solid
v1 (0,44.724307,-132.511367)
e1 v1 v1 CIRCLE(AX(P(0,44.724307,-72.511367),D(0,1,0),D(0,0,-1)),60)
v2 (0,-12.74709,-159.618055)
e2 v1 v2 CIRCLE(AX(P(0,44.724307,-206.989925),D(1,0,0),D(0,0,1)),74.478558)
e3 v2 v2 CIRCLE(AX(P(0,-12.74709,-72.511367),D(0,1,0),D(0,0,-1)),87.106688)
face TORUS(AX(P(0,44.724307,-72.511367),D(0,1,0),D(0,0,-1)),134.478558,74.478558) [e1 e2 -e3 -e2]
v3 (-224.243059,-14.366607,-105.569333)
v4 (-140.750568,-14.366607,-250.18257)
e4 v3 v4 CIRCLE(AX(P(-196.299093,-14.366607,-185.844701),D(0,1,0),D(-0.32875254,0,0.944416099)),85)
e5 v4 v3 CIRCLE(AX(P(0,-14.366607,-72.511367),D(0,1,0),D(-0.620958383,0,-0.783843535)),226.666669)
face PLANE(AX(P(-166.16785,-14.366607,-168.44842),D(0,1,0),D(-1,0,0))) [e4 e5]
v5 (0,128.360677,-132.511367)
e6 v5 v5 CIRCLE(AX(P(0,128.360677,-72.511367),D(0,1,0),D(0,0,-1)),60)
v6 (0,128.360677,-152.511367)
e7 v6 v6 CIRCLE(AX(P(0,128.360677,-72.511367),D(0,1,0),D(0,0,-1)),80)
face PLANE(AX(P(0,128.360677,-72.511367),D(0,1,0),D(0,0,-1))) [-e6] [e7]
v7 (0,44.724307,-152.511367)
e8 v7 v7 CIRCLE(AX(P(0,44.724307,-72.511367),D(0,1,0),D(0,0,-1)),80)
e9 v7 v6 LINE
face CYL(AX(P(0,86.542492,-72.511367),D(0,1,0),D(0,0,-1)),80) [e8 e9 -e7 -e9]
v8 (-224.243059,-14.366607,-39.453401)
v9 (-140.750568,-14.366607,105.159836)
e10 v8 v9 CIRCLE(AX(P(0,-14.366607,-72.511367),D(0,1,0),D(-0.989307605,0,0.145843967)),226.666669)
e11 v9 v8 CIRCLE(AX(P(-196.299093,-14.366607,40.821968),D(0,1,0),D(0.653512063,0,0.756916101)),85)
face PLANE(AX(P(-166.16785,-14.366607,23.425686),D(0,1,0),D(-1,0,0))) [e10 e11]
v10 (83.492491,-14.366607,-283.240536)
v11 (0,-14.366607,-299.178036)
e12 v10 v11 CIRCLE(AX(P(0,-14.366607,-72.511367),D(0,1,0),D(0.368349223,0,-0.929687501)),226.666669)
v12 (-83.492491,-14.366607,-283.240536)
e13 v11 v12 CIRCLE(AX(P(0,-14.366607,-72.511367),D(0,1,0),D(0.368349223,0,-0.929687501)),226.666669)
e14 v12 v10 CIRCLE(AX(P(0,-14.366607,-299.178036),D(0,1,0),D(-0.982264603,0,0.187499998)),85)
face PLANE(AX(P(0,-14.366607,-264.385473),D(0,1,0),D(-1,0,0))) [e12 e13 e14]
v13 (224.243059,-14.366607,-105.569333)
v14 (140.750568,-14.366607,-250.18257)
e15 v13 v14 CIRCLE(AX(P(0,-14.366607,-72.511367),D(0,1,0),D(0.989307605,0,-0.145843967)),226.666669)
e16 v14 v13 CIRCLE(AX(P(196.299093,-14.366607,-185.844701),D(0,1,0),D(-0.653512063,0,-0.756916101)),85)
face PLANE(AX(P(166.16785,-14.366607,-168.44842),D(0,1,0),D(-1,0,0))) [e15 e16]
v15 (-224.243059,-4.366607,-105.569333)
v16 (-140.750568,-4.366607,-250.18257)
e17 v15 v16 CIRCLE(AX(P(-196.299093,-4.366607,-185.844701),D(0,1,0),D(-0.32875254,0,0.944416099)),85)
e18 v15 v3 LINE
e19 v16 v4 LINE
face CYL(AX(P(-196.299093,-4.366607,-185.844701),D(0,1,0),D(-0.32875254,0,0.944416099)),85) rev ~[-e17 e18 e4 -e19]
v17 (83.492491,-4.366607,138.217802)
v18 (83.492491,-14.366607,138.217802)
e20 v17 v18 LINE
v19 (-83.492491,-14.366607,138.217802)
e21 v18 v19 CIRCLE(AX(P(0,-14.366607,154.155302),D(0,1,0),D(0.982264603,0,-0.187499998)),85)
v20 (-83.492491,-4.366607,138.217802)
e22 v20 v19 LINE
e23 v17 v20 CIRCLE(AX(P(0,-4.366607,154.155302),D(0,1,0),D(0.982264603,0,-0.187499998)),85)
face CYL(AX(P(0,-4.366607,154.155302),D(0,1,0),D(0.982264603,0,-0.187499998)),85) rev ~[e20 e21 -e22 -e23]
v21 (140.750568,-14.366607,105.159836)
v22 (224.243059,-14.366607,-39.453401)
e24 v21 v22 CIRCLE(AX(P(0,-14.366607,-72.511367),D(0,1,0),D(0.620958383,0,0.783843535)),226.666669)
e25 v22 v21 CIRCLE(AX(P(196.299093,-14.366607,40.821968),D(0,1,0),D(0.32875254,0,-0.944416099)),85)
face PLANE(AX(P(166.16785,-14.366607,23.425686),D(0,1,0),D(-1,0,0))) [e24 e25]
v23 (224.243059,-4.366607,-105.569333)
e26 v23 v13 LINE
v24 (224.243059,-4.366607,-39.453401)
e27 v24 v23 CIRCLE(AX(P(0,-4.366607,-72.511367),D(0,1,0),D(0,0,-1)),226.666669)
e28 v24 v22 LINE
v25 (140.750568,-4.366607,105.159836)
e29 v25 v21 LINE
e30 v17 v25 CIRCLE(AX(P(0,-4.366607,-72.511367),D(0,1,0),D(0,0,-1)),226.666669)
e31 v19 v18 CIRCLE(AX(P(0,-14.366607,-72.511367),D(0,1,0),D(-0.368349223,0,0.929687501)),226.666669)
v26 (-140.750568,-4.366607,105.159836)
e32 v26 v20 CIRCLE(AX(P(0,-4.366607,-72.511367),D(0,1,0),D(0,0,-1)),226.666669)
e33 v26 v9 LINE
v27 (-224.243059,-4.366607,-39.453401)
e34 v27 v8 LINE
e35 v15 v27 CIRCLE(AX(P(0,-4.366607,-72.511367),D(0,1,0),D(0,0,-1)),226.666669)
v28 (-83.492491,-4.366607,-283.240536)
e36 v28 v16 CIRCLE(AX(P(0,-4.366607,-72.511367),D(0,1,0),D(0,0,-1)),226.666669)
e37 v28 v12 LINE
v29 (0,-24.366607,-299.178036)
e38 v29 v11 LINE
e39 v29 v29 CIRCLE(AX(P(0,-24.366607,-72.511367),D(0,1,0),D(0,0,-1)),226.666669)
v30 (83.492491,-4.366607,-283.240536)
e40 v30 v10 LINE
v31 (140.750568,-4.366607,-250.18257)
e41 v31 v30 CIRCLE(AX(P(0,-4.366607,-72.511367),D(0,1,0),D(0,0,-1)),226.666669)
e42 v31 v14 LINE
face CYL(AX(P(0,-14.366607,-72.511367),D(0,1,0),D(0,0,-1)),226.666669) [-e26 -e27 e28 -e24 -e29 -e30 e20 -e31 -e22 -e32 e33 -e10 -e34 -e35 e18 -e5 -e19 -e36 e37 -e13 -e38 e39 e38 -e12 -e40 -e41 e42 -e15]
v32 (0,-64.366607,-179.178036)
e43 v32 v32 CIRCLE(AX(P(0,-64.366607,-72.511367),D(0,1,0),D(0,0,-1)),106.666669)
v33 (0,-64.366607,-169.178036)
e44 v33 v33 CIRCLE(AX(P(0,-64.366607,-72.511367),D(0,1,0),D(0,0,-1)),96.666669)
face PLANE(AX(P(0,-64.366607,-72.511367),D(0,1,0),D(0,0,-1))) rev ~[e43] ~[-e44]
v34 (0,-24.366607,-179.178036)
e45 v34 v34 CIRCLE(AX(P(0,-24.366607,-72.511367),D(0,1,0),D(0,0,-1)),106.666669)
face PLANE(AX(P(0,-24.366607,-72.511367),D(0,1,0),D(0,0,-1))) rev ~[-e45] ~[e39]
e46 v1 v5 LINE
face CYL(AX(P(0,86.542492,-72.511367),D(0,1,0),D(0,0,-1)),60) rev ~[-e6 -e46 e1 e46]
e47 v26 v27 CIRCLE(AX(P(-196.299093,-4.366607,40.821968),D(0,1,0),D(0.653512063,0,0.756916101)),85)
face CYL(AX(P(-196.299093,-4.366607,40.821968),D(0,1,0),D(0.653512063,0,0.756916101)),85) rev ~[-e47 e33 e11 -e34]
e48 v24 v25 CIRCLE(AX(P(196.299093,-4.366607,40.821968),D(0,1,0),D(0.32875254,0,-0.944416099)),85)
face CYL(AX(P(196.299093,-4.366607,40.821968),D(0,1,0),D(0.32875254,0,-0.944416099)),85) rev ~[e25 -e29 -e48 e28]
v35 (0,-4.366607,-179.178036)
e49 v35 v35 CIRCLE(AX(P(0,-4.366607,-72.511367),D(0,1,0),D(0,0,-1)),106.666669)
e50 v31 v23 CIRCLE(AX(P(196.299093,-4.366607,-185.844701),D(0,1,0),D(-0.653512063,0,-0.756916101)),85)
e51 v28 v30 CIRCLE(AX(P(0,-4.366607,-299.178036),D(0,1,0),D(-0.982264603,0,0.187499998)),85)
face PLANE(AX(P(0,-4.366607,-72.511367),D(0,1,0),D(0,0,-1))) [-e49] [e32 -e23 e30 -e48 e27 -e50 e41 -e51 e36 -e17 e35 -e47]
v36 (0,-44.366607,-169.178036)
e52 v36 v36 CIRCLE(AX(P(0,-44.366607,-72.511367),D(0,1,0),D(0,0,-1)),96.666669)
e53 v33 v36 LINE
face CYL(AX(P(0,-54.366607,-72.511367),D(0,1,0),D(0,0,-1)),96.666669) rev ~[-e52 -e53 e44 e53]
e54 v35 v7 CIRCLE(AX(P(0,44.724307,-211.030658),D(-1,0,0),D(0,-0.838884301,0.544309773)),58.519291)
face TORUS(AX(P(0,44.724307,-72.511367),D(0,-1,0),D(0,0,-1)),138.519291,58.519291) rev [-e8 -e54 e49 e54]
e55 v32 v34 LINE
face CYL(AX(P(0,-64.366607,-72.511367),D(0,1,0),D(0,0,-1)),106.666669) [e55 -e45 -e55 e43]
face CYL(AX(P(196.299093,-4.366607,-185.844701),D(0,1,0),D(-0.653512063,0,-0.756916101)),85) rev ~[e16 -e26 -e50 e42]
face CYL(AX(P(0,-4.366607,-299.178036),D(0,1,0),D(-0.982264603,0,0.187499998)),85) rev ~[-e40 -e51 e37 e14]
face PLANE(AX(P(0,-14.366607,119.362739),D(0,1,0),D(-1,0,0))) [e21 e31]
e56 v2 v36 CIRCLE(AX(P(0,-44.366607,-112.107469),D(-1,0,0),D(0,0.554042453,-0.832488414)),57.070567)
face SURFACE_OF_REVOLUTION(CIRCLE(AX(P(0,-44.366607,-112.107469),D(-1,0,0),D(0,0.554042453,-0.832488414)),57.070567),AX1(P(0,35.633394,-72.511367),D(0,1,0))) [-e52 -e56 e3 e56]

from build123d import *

# Parameters (mm, degrees)
F0_W     = 20
F0_H     = 10
F0_H_2   = 120
F0_W_2   = 83.6363699974
F0_H_3   = 20
F3_DEPTH = 10
F4_DEPTH = 10


with BuildPart() as f1:
    # F0 (on Right) → F1 (revolve)
    with BuildSketch(Plane.YZ):
        with Locations((-54.3666072938, -174.1780357832)):
            Rectangle(F0_W, F0_H)
        with BuildLine():
            ThreePointArc((-12.7470903483, -159.618054612), (-27.8500467267, -166.7357841949), (-44.3666072938, -169.1780357832))
            Line((-44.3666072938, -169.1780357832), (-44.3666072938, -179.1780357832))
            Line((-44.3666072938, -179.1780357832), (-24.3666072938, -179.1780357832))
            ThreePointArc((-24.3666072938, -179.1780357832), (-19.3081292942, -168.9517504843), (-12.7470903483, -159.618054612))
        make_face()
        with Locations((-14.3666072938, -239.1780357832)):
            Rectangle(F0_W, F0_H_2)
        with Locations((86.542492088, -142.5113668702)):
            Rectangle(F0_W_2, F0_H_3)
        with BuildLine():
            ThreePointArc((44.7243070893, -132.5113668702), (12.9527237019, -139.6280506805), (-12.7470903483, -159.618054612))
            ThreePointArc((-12.7470903483, -159.618054612), (-19.3081292942, -168.9517504843), (-24.3666072938, -179.1780357832))
            Line((-24.3666072938, -179.1780357832), (-4.3666072938, -179.1780357832))
            ThreePointArc((-4.3666072938, -179.1780357832), (16.7912213938, -159.6083850702), (44.7243070893, -152.5113668702))
            Line((44.7243070893, -152.5113668702), (44.7243070893, -132.5113668702))
        make_face()
    revolve(axis=Axis((0, 35.6333935665, -72.5113668702), (0, 1, 0)))

    # F2 (on face) → F3 (cut)
    with BuildSketch(Plane(origin=(0, -4.3666072938, 0), x_dir=(-1, 0, 0), z_dir=(0, 1, 0))):
        with BuildLine():
            ThreePointArc((224.2430593698, -105.5693329389), (122.6869341482, -143.3447013267), (140.7505680979, -250.1825698723))
            ThreePointArc((140.7505680979, -250.1825698723), (196.2990934699, -185.8447013267), (224.2430593698, -105.5693329389))
        make_face()
    extrude(amount=-F3_DEPTH, mode=Mode.SUBTRACT)

    # F2 (on face) → F4 (cut)
    with BuildSketch(Plane(origin=(0, -4.3666072938, 0), x_dir=(-1, 0, 0), z_dir=(0, 1, 0))):
        with BuildLine():
            ThreePointArc((-83.4924912719, -283.2405359411), (0, -299.1780357832), (83.4924912719, -283.2405359411))
            ThreePointArc((83.4924912719, -283.2405359411), (0, -214.1780357832), (-83.4924912719, -283.2405359411))
        make_face()
        with BuildLine():
            ThreePointArc((-224.2430593698, -105.5693329389), (-196.2990934699, -185.8447013267), (-140.7505680979, -250.1825698723))
            ThreePointArc((-140.7505680979, -250.1825698723), (-122.6869341482, -143.3447013267), (-224.2430593698, -105.5693329389))
        make_face()
        with BuildLine():
            ThreePointArc((-140.7505680979, 105.159836132), (-196.2990934699, 40.8219675864), (-224.2430593698, -39.4534008014))
            ThreePointArc((-224.2430593698, -39.4534008014), (-122.6869341482, -1.6780324136), (-140.7505680979, 105.159836132))
        make_face()
        with BuildLine():
            ThreePointArc((140.7505680979, 105.159836132), (122.6869341482, -1.6780324136), (224.2430593698, -39.4534008014))
            ThreePointArc((224.2430593698, -39.4534008014), (196.2990934699, 40.8219675864), (140.7505680979, 105.159836132))
        make_face()
        with BuildLine():
            ThreePointArc((83.4924912719, 138.2178022008), (0, 154.1553020429), (-83.4924912719, 138.2178022008))
            ThreePointArc((-83.4924912719, 138.2178022008), (0, 69.1553020429), (83.4924912719, 138.2178022008))
        make_face()
    extrude(amount=-F4_DEPTH, mode=Mode.SUBTRACT)


solid = f1.part
